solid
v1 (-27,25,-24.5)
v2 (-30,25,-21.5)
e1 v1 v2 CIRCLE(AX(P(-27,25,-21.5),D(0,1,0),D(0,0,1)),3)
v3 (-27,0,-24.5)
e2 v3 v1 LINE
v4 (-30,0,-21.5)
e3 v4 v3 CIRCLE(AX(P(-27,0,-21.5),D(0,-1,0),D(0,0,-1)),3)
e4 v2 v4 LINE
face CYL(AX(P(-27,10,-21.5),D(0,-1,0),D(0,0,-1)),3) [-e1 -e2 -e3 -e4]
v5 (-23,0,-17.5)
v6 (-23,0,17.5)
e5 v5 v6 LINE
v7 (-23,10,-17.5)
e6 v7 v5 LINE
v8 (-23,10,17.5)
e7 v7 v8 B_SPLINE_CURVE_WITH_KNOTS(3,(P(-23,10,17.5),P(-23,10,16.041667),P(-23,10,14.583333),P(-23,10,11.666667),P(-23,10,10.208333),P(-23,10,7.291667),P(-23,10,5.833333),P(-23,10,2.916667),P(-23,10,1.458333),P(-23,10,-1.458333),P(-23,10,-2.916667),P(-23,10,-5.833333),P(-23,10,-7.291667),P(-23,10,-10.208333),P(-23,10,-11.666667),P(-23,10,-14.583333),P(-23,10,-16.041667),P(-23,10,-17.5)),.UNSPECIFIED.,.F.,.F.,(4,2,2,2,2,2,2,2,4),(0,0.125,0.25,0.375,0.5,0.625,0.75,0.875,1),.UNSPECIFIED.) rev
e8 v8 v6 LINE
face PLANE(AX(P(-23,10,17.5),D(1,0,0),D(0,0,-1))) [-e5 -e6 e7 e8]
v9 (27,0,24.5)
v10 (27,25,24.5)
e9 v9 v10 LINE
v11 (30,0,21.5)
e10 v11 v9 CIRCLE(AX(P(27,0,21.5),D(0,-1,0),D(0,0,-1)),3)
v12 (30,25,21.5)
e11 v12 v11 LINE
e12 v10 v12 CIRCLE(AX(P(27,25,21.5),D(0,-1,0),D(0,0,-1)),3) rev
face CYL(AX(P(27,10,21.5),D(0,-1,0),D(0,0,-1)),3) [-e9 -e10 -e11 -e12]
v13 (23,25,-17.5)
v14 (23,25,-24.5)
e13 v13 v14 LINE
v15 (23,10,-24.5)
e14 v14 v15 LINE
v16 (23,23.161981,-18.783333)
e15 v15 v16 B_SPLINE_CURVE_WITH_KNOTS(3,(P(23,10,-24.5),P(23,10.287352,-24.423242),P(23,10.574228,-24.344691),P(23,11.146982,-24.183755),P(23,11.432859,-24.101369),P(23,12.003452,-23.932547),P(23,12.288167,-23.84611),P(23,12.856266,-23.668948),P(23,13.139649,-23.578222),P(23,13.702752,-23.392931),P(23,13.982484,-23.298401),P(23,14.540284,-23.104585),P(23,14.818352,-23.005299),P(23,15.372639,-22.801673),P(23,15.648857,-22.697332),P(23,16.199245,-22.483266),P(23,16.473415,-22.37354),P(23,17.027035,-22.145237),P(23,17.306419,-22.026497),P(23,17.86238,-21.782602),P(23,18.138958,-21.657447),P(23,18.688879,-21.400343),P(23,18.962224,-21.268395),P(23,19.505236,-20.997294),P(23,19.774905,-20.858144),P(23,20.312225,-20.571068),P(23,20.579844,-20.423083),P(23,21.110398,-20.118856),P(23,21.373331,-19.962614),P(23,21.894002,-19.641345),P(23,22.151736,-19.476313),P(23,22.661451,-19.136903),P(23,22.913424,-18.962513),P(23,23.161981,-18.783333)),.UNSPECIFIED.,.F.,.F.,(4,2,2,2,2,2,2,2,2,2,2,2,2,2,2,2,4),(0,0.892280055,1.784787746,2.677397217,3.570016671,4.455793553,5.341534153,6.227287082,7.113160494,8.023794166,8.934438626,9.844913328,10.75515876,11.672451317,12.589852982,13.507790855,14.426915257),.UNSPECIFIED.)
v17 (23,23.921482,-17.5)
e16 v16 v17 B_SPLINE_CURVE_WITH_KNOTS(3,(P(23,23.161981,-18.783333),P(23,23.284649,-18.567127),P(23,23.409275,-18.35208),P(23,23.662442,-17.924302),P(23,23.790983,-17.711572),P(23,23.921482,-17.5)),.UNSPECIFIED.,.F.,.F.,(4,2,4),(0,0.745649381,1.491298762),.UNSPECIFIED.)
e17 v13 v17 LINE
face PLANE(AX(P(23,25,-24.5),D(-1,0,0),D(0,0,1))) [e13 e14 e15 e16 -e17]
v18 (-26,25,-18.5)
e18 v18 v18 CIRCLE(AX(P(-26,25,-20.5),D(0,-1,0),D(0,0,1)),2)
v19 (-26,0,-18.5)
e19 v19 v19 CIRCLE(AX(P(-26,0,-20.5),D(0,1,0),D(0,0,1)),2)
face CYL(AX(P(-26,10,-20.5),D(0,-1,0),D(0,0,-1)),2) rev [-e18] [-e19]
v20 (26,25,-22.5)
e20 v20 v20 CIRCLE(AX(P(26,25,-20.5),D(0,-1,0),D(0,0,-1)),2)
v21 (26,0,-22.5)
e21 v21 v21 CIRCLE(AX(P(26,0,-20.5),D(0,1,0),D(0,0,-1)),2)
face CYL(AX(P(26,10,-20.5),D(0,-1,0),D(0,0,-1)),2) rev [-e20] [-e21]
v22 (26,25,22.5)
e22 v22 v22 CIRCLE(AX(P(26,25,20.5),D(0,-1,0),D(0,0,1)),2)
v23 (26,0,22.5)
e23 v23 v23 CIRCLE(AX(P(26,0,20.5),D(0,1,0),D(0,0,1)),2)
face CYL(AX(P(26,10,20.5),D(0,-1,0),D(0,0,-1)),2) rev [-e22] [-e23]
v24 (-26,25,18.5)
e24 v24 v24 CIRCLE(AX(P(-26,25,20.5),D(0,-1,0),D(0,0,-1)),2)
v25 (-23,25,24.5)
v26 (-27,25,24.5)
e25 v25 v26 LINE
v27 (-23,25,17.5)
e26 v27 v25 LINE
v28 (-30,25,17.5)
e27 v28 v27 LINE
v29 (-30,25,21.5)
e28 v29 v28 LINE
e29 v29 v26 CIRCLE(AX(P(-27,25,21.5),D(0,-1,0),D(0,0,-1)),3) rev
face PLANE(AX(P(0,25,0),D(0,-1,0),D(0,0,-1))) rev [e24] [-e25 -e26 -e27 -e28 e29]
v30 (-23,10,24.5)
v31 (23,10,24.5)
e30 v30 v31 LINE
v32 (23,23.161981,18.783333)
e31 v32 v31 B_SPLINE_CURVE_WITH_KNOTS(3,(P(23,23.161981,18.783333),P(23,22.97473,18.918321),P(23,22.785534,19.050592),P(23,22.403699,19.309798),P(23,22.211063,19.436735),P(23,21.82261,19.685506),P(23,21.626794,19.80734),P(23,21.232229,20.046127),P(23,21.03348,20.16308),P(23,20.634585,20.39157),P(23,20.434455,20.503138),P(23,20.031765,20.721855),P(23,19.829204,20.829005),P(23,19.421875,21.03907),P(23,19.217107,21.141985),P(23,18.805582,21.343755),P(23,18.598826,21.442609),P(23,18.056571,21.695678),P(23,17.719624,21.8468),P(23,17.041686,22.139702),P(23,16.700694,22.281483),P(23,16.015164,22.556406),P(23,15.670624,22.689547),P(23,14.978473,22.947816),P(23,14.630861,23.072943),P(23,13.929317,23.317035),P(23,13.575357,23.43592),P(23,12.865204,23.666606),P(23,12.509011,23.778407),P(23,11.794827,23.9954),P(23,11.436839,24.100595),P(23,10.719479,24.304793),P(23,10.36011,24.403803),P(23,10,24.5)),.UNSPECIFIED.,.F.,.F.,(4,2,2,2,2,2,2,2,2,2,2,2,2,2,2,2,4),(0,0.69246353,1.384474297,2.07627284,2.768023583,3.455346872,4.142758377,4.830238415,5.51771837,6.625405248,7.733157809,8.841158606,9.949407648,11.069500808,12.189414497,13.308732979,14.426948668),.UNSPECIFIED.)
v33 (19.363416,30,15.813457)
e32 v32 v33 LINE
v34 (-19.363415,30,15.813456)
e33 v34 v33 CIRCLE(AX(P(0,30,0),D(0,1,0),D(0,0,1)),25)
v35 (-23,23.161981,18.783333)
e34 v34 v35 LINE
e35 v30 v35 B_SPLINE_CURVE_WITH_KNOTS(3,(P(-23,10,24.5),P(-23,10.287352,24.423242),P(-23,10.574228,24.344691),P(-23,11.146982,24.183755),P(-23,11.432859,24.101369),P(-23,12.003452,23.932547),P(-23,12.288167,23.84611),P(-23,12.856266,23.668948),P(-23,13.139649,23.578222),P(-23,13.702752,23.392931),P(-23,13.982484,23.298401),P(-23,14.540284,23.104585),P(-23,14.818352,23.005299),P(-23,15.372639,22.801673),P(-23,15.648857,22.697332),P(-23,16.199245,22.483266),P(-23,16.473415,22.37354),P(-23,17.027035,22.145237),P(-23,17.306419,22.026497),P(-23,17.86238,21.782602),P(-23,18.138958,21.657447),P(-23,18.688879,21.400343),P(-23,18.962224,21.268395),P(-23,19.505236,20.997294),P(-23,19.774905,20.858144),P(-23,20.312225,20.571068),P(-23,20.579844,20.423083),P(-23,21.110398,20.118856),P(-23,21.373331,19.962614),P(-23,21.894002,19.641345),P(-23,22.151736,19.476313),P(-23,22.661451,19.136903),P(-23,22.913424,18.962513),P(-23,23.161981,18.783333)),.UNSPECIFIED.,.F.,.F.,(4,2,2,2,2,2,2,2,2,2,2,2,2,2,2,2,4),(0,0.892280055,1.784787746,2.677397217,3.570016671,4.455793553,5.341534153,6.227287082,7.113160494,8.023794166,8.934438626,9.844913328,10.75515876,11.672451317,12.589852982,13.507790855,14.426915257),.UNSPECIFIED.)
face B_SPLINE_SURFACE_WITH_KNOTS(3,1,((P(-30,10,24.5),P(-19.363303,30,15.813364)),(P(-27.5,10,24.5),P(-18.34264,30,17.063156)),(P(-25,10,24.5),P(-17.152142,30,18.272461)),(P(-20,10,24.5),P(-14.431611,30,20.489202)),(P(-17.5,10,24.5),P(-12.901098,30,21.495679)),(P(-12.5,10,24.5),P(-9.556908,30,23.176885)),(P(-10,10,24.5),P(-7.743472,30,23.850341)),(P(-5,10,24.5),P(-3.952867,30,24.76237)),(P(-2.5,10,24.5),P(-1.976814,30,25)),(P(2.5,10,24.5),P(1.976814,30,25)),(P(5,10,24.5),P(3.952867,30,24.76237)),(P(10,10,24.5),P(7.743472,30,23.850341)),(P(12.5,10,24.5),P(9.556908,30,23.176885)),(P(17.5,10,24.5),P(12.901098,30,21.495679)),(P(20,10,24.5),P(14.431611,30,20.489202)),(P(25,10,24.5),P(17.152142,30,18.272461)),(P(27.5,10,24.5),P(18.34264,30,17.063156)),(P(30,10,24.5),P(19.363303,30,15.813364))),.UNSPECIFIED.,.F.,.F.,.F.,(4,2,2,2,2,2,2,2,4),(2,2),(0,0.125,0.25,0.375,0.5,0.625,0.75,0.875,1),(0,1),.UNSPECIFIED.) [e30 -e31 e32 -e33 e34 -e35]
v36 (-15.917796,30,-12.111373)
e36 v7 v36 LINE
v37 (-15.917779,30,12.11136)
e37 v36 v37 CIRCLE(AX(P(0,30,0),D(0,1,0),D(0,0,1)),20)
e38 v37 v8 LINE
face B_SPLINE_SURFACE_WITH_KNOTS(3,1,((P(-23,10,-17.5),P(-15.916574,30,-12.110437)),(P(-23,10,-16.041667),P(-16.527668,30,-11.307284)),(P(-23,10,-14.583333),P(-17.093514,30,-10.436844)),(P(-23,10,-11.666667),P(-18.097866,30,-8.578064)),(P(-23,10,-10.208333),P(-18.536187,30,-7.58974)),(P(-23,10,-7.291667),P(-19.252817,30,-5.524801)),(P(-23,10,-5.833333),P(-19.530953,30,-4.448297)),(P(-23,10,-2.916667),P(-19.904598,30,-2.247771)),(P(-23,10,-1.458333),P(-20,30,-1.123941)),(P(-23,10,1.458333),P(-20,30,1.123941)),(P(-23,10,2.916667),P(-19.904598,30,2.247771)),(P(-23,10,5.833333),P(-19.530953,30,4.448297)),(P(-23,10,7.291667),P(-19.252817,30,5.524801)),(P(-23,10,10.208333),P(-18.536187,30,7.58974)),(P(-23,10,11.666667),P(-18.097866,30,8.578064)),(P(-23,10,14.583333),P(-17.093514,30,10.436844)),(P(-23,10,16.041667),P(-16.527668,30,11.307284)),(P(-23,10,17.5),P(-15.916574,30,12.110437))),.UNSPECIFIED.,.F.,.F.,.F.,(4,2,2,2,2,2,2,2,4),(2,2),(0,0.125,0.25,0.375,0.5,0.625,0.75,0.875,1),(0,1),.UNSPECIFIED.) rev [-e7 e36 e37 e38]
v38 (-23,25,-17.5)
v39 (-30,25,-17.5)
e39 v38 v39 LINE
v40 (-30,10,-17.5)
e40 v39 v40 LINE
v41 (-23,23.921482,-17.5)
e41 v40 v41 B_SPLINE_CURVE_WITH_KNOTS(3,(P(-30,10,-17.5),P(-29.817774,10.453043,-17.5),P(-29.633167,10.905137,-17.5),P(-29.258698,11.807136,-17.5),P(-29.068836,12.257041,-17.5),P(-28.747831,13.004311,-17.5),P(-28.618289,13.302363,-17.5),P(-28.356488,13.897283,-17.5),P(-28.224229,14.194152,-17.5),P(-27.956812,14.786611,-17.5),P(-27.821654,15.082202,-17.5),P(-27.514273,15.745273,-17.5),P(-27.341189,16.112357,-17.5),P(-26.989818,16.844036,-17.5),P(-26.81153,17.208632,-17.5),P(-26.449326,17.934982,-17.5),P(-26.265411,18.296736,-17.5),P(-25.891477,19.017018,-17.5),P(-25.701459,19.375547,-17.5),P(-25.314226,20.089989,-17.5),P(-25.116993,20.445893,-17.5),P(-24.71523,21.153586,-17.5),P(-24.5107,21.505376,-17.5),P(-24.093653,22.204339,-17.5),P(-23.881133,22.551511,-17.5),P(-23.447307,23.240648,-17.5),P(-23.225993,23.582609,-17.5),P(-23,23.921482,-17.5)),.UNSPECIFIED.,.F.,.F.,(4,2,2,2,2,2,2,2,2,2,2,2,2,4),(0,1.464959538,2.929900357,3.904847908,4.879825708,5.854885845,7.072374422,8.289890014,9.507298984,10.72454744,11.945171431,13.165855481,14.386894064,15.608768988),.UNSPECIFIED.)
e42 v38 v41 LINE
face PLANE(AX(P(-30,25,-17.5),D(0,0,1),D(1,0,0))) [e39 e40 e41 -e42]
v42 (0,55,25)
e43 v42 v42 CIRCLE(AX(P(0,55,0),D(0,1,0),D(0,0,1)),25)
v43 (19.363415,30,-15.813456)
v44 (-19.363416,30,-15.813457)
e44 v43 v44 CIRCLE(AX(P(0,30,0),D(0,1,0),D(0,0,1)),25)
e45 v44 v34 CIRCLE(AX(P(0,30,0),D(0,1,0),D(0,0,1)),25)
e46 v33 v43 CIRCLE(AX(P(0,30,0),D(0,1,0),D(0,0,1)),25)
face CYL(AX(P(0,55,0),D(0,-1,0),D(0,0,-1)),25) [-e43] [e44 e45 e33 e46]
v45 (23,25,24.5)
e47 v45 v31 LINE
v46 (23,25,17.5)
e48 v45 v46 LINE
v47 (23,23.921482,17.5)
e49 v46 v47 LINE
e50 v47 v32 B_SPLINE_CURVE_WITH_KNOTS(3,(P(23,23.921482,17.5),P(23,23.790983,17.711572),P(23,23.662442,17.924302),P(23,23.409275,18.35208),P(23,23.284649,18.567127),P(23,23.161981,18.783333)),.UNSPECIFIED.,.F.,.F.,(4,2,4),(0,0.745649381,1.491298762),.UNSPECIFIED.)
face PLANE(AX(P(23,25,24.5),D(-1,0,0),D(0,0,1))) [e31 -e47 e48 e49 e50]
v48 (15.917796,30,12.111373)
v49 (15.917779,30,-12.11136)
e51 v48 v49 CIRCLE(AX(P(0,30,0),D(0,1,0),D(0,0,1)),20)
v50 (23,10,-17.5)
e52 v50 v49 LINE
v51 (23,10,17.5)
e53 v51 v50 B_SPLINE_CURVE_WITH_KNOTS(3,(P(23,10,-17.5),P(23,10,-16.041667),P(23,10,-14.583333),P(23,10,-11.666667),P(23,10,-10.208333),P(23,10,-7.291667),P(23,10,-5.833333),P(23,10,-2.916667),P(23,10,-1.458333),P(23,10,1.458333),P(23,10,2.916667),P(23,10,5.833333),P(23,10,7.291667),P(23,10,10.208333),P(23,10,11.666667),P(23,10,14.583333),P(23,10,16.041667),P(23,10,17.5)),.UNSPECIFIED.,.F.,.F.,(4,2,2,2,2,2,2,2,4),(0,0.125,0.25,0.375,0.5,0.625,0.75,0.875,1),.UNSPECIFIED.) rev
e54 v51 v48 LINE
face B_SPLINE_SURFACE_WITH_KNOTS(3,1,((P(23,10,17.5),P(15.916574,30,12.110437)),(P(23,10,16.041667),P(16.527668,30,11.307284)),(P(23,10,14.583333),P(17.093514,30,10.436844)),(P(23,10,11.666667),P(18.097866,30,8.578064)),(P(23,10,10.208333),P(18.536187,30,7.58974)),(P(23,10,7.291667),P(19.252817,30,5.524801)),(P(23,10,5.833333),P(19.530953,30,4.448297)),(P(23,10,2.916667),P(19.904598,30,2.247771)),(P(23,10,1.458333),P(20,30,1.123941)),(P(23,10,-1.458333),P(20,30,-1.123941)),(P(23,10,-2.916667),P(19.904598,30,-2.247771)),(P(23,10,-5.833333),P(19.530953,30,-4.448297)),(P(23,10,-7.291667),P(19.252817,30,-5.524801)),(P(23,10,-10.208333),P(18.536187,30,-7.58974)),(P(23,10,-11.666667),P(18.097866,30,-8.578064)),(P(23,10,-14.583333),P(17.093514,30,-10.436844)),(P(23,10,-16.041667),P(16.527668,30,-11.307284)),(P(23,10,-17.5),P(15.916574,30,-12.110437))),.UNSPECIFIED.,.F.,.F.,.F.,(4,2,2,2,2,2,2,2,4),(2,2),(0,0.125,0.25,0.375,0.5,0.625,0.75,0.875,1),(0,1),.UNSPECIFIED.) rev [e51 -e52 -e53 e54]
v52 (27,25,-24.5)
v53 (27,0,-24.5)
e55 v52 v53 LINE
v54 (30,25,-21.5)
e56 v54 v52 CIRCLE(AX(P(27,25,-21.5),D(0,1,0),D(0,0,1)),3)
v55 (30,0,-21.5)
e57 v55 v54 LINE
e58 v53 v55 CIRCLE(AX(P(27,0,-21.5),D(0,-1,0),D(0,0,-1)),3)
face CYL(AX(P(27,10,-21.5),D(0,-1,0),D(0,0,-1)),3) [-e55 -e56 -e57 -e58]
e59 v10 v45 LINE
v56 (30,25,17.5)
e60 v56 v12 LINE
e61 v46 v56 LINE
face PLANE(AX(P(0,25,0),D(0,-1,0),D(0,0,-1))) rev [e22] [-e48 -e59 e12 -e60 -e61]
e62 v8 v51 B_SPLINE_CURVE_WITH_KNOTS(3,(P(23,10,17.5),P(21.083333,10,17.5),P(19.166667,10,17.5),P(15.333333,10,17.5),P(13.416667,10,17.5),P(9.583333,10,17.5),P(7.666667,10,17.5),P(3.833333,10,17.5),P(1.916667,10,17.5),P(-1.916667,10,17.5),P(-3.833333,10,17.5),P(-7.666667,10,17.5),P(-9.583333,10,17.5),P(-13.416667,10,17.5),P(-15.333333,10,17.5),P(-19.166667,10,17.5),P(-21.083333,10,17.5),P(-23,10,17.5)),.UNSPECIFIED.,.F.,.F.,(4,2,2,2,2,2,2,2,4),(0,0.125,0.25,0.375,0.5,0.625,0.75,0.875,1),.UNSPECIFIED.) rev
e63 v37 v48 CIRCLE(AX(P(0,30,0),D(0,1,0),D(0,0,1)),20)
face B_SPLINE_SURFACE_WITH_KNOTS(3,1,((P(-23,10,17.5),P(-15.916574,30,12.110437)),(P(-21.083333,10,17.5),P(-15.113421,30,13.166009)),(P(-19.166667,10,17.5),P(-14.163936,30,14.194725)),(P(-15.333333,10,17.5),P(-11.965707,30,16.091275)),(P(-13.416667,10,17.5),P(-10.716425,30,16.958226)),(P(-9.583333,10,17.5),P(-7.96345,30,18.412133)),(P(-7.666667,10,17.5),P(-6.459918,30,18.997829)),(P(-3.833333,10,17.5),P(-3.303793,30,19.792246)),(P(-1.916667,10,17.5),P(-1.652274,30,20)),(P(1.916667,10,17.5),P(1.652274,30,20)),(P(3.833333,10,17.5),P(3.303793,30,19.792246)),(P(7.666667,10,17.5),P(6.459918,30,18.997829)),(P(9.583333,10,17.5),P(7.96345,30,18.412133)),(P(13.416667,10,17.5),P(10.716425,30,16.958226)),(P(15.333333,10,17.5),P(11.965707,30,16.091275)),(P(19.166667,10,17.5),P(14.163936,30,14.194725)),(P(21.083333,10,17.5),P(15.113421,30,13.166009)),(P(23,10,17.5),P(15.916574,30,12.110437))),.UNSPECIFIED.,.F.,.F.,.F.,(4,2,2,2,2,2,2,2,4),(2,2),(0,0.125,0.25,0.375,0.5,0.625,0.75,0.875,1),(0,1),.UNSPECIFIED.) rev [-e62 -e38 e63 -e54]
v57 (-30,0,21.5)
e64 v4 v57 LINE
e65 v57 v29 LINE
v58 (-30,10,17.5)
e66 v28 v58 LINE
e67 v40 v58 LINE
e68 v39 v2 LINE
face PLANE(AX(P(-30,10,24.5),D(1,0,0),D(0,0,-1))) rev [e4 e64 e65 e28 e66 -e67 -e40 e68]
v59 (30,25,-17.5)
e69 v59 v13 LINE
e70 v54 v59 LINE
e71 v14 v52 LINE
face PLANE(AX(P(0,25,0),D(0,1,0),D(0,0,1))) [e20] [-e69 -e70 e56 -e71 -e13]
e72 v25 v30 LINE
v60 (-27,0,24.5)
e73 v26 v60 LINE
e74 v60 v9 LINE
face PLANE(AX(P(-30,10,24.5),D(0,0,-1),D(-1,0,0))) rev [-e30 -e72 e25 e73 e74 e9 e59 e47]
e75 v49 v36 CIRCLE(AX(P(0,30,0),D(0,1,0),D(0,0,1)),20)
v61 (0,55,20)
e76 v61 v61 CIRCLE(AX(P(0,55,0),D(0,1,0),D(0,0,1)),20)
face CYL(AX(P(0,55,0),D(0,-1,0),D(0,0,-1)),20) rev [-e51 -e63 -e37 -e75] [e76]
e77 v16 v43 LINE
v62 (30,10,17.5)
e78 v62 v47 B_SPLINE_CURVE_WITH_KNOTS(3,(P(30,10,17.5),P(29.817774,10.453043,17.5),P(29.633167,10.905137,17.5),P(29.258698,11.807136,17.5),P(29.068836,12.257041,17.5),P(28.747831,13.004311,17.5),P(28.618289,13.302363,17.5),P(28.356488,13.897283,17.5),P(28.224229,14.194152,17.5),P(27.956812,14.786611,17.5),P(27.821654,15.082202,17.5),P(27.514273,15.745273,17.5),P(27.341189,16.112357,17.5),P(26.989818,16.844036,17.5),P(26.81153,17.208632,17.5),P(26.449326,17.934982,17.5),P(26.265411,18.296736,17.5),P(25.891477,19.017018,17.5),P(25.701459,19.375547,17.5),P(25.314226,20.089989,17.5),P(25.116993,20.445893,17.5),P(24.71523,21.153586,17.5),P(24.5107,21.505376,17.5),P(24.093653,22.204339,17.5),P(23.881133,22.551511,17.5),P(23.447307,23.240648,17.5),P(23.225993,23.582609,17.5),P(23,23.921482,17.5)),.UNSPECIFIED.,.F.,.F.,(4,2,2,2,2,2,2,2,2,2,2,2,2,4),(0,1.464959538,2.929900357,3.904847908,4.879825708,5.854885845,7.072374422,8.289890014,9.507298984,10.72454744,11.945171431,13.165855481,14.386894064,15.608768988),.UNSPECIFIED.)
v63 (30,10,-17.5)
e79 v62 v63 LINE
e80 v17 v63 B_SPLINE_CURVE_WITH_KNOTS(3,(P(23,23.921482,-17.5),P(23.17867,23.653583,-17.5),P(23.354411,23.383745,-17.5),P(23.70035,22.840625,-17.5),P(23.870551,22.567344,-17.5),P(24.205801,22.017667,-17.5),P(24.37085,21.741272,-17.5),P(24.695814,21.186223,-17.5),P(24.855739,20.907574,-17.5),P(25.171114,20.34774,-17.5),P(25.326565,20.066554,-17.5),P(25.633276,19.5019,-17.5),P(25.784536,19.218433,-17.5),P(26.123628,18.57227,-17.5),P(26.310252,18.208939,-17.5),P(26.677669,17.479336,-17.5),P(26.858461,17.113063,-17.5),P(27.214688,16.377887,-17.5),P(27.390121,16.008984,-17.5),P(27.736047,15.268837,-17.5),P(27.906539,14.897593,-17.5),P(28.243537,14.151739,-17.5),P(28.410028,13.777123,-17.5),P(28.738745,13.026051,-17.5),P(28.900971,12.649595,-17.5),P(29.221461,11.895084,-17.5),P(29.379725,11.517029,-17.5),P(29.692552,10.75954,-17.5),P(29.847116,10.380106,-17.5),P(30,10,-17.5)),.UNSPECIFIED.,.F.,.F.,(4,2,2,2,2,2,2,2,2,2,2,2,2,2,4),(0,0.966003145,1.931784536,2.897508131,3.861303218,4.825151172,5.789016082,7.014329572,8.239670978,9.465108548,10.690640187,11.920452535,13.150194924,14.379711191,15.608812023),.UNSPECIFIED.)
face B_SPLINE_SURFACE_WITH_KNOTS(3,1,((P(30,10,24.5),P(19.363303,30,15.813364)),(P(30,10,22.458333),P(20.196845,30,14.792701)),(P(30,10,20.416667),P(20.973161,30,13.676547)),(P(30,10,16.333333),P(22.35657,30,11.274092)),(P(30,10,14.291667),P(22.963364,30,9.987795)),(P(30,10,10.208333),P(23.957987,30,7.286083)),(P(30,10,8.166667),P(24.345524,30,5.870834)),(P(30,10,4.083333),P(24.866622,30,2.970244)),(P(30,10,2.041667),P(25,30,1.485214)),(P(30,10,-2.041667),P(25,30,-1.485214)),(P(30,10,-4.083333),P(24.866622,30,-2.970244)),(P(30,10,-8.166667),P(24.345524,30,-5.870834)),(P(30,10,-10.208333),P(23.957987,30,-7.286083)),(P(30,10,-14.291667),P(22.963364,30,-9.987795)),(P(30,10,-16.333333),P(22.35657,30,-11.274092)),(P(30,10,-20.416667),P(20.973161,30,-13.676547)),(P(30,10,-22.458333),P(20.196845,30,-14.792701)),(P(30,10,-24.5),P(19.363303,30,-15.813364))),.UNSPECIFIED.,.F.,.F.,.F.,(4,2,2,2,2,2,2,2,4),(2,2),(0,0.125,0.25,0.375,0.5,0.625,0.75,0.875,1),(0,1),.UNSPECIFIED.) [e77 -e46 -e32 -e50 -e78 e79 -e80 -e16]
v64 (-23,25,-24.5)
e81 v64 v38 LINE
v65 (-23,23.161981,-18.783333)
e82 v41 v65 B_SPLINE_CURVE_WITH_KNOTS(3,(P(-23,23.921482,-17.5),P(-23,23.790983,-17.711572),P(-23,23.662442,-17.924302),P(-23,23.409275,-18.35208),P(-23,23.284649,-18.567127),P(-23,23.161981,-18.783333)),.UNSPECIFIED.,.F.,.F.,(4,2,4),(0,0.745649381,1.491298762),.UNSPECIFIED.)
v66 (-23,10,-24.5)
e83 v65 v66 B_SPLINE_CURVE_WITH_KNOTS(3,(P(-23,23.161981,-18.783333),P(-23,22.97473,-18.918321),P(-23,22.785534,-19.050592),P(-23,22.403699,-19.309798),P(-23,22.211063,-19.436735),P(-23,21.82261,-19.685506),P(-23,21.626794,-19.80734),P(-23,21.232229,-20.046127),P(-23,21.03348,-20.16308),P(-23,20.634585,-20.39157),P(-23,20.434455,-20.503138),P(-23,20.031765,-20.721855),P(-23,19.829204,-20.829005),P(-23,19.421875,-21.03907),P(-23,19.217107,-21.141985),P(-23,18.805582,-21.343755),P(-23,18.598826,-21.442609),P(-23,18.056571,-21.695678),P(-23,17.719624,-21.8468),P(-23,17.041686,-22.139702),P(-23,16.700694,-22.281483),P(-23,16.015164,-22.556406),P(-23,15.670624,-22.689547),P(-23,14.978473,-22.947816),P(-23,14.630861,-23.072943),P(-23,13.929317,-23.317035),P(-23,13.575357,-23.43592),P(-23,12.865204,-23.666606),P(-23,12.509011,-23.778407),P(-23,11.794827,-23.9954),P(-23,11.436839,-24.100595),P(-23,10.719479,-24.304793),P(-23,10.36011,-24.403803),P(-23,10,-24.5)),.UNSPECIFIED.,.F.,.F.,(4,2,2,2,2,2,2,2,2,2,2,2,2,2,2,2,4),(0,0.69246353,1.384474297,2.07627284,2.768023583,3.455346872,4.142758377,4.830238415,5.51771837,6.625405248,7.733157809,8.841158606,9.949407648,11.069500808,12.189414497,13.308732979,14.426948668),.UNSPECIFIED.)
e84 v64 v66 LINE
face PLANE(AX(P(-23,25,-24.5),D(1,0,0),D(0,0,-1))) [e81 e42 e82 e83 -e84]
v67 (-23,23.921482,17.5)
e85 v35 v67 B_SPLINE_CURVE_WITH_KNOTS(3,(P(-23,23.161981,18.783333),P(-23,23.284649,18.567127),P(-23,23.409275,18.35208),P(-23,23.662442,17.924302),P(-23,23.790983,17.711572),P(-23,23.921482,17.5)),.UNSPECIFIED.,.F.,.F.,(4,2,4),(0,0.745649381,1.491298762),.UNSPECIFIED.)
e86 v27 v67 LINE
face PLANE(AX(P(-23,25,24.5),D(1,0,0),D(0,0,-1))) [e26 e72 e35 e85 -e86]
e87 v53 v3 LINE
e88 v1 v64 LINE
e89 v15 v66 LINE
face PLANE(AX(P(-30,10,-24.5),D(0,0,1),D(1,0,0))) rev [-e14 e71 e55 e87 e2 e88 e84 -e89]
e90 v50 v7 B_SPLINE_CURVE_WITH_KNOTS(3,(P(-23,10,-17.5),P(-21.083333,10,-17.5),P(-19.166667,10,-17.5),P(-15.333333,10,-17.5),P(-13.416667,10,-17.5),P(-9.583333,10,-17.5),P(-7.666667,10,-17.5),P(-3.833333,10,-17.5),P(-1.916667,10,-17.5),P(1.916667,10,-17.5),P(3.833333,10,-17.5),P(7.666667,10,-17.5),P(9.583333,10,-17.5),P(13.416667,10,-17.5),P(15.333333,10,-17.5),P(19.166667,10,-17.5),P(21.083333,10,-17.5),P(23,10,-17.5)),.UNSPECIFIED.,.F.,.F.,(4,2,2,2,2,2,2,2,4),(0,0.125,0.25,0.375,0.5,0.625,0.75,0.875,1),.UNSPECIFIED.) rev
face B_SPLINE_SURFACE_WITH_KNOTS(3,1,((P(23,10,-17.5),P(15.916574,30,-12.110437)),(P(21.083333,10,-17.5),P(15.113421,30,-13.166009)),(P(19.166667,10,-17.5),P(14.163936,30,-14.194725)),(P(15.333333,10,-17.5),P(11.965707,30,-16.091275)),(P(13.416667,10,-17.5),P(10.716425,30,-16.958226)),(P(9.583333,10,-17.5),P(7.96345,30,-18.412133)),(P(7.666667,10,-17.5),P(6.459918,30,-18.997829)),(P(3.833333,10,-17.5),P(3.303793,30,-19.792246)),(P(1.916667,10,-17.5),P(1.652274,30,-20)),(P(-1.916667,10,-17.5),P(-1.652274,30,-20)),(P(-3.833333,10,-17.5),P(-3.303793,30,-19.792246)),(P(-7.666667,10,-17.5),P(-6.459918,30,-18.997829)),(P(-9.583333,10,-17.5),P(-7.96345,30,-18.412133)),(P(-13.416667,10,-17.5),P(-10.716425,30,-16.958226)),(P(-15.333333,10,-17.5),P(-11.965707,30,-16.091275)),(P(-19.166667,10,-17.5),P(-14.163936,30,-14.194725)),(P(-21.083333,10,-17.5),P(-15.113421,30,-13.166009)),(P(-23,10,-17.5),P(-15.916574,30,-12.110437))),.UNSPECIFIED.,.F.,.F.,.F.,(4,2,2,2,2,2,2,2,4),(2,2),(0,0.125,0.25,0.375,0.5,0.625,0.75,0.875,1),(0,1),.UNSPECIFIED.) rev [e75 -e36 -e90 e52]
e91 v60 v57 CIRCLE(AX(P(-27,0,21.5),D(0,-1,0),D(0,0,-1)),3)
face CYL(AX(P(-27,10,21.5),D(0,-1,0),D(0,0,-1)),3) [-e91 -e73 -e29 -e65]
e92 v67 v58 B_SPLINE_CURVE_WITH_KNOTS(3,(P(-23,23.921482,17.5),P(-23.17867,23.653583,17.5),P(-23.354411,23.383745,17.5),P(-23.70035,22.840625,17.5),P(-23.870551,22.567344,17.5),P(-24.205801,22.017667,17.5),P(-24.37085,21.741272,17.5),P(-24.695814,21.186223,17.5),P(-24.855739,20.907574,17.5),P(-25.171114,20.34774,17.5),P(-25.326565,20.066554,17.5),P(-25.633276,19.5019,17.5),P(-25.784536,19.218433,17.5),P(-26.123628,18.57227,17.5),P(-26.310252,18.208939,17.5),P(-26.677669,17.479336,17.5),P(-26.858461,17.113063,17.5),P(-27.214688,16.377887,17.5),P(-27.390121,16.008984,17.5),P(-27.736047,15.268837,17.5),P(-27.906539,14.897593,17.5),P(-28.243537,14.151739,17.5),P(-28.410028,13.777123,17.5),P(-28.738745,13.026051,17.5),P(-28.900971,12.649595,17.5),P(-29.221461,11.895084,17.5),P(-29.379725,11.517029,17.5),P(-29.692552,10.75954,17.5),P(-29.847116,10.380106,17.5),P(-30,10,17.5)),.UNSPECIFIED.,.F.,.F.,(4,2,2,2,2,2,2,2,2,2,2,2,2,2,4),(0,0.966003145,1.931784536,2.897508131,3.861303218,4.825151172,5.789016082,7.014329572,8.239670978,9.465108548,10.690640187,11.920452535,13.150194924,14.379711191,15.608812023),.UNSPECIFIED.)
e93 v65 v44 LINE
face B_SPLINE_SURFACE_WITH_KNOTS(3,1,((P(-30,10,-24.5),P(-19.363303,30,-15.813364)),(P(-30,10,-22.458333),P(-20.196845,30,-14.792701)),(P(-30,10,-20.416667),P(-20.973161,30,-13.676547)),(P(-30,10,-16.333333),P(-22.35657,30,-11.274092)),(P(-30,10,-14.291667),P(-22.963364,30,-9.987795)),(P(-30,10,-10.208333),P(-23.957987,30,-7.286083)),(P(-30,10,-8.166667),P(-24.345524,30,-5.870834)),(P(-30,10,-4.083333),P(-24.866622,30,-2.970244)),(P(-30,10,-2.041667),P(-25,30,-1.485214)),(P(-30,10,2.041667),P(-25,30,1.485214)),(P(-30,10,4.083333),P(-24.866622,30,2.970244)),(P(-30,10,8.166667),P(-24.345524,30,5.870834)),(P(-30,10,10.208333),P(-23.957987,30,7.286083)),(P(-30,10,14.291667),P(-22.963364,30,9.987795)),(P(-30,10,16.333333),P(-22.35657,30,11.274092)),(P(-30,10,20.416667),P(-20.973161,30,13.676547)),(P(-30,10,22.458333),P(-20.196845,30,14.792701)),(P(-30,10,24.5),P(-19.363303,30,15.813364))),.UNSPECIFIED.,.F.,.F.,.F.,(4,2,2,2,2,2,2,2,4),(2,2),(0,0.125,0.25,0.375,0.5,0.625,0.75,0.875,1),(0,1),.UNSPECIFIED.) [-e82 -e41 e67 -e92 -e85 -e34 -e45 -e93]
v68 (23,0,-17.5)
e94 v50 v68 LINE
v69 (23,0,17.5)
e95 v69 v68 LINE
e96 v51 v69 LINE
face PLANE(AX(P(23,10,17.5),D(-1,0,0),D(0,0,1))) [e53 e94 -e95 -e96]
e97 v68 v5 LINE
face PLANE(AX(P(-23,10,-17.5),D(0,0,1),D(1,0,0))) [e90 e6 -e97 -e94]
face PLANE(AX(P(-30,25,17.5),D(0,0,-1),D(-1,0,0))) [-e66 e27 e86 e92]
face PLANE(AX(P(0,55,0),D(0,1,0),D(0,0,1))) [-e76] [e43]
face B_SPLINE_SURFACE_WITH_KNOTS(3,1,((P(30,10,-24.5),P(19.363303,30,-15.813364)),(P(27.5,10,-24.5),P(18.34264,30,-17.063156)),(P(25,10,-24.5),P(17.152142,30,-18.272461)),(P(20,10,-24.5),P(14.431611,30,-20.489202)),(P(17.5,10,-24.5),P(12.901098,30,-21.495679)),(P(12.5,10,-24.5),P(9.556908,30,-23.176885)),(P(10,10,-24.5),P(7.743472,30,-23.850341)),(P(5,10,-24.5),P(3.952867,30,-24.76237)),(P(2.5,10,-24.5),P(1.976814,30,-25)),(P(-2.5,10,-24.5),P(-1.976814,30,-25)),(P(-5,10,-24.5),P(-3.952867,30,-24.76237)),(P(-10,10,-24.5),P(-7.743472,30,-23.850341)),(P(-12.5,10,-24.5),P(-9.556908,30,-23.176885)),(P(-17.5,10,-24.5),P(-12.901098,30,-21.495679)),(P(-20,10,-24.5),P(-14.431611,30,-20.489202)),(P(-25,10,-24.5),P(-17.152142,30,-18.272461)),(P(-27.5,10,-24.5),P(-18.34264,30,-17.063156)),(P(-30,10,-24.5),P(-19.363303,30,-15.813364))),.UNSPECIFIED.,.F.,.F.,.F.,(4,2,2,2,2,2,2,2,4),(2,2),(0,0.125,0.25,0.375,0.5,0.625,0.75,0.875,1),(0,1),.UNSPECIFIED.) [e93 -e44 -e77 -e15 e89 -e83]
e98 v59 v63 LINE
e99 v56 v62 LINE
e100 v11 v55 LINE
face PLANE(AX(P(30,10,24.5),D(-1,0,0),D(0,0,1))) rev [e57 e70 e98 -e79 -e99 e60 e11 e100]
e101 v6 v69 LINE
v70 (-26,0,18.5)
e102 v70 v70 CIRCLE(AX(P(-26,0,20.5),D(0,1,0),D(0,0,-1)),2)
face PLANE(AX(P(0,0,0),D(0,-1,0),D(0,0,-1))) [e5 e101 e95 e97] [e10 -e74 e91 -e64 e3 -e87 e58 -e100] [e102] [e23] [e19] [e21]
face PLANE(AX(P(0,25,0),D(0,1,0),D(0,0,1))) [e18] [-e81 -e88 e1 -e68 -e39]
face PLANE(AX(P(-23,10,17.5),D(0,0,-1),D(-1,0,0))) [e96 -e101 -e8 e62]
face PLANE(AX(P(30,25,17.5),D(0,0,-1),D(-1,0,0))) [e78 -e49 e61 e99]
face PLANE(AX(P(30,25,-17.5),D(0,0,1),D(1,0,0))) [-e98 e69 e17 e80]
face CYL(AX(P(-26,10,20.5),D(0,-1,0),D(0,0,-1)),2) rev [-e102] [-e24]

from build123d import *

# Parameters (mm, degrees)
SKETCH1_W           = 60
SKETCH1_H           = 49
SKETCH1_R           = 2
SKETCH1_W_2         = 46
SKETCH1_H_2         = 35
BOSS_EXTRUDE1_DEPTH = 10
SKETCH6_R           = 2
CUT_EXTRUDE3_DEPTH  = 50.244289182
SKETCH7_W           = 7
SKETCH7_H           = 7
SKETCH7_R           = 2
BOSS_EXTRUDE4_DEPTH = 25
SKETCH10_R          = 25
SKETCH10_R_2        = 20
BOSS_EXTRUDE5_DEPTH = 25
FILLET2_R           = 3


with BuildPart() as part:
    # Sketch1 → Boss-Extrude1 (new body)
    with BuildSketch(Plane(origin=(0, 0, 0), x_dir=(1, 0, 0), z_dir=(0, 1, 0))):
        Rectangle(SKETCH1_W, SKETCH1_H)
        with Locations((-26, 20.5)):
            Circle(SKETCH1_R, mode=Mode.SUBTRACT)
        with Locations((26, 20.5)):
            Circle(SKETCH1_R, mode=Mode.SUBTRACT)
        with Locations((26, -20.5)):
            Circle(SKETCH1_R, mode=Mode.SUBTRACT)
        with Locations((-26, -20.5)):
            Circle(SKETCH1_R, mode=Mode.SUBTRACT)
        Rectangle(SKETCH1_W_2, SKETCH1_H_2, mode=Mode.SUBTRACT)
    extrude(amount=BOSS_EXTRUDE1_DEPTH)

    # Sketch9 → Loft1 section 0
    with BuildSketch(Plane(origin=(0, 10, 0), x_dir=(1, 0, 0), z_dir=(0, 1, 0))):
        with BuildLine():
            Line((30, -24.5), (-30, -24.5))
            Line((-30, -24.5), (-30, 24.5))
            Line((-30, 24.5), (30, 24.5))
            Line((30, 24.5), (30, -24.5))
        make_face()
    # Sketch8 for Loft1 → Loft1 section 1
    with BuildSketch(Plane(origin=(0, 30, 0), x_dir=(1, 0, 0), z_dir=(0, 1, 0))):
        with BuildLine():
            # circular arc as an exact rational Bezier (weights 1, cos(half-angle), 1)
            Bezier((19.36330319, -15.813364272), (0, -39.523531441), (-19.36330319, -15.813364272), weights=[1, 0.632534571, 1])
            Bezier((-19.36330319, -15.813364272), (-32.277550677, 0), (-19.36330319, 15.813364272), weights=[1, 0.774532128, 1])
            Bezier((-19.36330319, 15.813364272), (0, 39.523531441), (19.36330319, 15.813364272), weights=[1, 0.632534571, 1])
            Bezier((19.36330319, 15.813364272), (32.277550677, 0), (19.36330319, -15.813364272), weights=[1, 0.774532128, 1])
        make_face()
    loft()

    # Sketch2 → Cut-Loft1 section 0
    with BuildSketch(Plane(origin=(0, 10, 0), x_dir=(1, 0, 0), z_dir=(0, 1, 0))):
        with BuildLine():
            Line((-23, -17.5), (23, -17.5))
            Line((23, -17.5), (23, 17.5))
            Line((23, 17.5), (-23, 17.5))
            Line((-23, 17.5), (-23, -17.5))
        make_face()
    # Sketch3 for Cut-Loft1 → Cut-Loft1 section 1
    with BuildSketch(Plane(origin=(0, 30, 0), x_dir=(1, 0, 0), z_dir=(0, 1, 0))):
        with BuildLine():
            Bezier((-15.916573882, -12.11043665), (0, -33.029362323), (15.916573882, -12.11043665), weights=[1, 0.605521832, 1])
            Bezier((15.916573882, -12.11043665), (25.131036551, 0), (15.916573882, 12.11043665), weights=[1, 0.795828694, 1])
            Bezier((15.916573882, 12.11043665), (0, 33.029362323), (-15.916573882, 12.11043665), weights=[1, 0.605521832, 1])
            Bezier((-15.916573882, 12.11043665), (-25.131036551, 0), (-15.916573882, -12.11043665), weights=[1, 0.795828694, 1])
        make_face()
    loft(mode=Mode.SUBTRACT)

    # Sketch6 → Cut-Extrude3 (cut, through all)
    with BuildSketch(Plane.XZ):
        with Locations((26, 20.5)):
            Circle(SKETCH6_R)
        with Locations((26, -20.5)):
            Circle(SKETCH6_R)
        with Locations((-26, -20.5)):
            Circle(SKETCH6_R)
        with Locations((-26, 20.5)):
            Circle(SKETCH6_R)
    extrude(amount=-CUT_EXTRUDE3_DEPTH, mode=Mode.SUBTRACT)

    # Sketch7 → Boss-Extrude4 (add)
    # profile 1 of 4: a face of its own
    with BuildSketch(Plane.XZ):
        with Locations((-26.5, 21)):
            Rectangle(SKETCH7_W, SKETCH7_H)
        with Locations((-26, 20.5)):
            Circle(SKETCH7_R, mode=Mode.SUBTRACT)
    # profile 2 of 4: a face of its own
    with BuildSketch(Plane.XZ):
        with Locations((-26.5, -21)):
            Rectangle(SKETCH7_W, SKETCH7_H)
        with Locations((-26, -20.5)):
            Circle(SKETCH7_R, mode=Mode.SUBTRACT)
    # profile 3 of 4: a face of its own
    with BuildSketch(Plane.XZ):
        with Locations((26.5, -21)):
            Rectangle(SKETCH7_W, SKETCH7_H)
        with Locations((26, -20.5)):
            Circle(SKETCH7_R, mode=Mode.SUBTRACT)
    # profile 4 of 4: a face of its own
    with BuildSketch(Plane.XZ):
        with Locations((26.5, 21)):
            Rectangle(SKETCH7_W, SKETCH7_H)
        with Locations((26, 20.5)):
            Circle(SKETCH7_R, mode=Mode.SUBTRACT)
    extrude(amount=-BOSS_EXTRUDE4_DEPTH)

    # Sketch10 → Boss-Extrude5 (add)
    with BuildSketch(Plane(origin=(0, 30, 0), x_dir=(1, 0, 0), z_dir=(0, 1, 0))):
        Circle(SKETCH10_R)
        Circle(SKETCH10_R_2, mode=Mode.SUBTRACT)
    extrude(amount=BOSS_EXTRUDE5_DEPTH)

    # Fillet2
    fillet2_edges = [part.edges().sort_by_distance(p)[0] for p in [
        (-30, 12.5, 24.5),
        (-30, 12.5, -24.5),
        (30, 12.5, -24.5),
        (30, 12.5, 24.5),
    ]]
    fillet(fillet2_edges, radius=FILLET2_R)


solid = part.part
